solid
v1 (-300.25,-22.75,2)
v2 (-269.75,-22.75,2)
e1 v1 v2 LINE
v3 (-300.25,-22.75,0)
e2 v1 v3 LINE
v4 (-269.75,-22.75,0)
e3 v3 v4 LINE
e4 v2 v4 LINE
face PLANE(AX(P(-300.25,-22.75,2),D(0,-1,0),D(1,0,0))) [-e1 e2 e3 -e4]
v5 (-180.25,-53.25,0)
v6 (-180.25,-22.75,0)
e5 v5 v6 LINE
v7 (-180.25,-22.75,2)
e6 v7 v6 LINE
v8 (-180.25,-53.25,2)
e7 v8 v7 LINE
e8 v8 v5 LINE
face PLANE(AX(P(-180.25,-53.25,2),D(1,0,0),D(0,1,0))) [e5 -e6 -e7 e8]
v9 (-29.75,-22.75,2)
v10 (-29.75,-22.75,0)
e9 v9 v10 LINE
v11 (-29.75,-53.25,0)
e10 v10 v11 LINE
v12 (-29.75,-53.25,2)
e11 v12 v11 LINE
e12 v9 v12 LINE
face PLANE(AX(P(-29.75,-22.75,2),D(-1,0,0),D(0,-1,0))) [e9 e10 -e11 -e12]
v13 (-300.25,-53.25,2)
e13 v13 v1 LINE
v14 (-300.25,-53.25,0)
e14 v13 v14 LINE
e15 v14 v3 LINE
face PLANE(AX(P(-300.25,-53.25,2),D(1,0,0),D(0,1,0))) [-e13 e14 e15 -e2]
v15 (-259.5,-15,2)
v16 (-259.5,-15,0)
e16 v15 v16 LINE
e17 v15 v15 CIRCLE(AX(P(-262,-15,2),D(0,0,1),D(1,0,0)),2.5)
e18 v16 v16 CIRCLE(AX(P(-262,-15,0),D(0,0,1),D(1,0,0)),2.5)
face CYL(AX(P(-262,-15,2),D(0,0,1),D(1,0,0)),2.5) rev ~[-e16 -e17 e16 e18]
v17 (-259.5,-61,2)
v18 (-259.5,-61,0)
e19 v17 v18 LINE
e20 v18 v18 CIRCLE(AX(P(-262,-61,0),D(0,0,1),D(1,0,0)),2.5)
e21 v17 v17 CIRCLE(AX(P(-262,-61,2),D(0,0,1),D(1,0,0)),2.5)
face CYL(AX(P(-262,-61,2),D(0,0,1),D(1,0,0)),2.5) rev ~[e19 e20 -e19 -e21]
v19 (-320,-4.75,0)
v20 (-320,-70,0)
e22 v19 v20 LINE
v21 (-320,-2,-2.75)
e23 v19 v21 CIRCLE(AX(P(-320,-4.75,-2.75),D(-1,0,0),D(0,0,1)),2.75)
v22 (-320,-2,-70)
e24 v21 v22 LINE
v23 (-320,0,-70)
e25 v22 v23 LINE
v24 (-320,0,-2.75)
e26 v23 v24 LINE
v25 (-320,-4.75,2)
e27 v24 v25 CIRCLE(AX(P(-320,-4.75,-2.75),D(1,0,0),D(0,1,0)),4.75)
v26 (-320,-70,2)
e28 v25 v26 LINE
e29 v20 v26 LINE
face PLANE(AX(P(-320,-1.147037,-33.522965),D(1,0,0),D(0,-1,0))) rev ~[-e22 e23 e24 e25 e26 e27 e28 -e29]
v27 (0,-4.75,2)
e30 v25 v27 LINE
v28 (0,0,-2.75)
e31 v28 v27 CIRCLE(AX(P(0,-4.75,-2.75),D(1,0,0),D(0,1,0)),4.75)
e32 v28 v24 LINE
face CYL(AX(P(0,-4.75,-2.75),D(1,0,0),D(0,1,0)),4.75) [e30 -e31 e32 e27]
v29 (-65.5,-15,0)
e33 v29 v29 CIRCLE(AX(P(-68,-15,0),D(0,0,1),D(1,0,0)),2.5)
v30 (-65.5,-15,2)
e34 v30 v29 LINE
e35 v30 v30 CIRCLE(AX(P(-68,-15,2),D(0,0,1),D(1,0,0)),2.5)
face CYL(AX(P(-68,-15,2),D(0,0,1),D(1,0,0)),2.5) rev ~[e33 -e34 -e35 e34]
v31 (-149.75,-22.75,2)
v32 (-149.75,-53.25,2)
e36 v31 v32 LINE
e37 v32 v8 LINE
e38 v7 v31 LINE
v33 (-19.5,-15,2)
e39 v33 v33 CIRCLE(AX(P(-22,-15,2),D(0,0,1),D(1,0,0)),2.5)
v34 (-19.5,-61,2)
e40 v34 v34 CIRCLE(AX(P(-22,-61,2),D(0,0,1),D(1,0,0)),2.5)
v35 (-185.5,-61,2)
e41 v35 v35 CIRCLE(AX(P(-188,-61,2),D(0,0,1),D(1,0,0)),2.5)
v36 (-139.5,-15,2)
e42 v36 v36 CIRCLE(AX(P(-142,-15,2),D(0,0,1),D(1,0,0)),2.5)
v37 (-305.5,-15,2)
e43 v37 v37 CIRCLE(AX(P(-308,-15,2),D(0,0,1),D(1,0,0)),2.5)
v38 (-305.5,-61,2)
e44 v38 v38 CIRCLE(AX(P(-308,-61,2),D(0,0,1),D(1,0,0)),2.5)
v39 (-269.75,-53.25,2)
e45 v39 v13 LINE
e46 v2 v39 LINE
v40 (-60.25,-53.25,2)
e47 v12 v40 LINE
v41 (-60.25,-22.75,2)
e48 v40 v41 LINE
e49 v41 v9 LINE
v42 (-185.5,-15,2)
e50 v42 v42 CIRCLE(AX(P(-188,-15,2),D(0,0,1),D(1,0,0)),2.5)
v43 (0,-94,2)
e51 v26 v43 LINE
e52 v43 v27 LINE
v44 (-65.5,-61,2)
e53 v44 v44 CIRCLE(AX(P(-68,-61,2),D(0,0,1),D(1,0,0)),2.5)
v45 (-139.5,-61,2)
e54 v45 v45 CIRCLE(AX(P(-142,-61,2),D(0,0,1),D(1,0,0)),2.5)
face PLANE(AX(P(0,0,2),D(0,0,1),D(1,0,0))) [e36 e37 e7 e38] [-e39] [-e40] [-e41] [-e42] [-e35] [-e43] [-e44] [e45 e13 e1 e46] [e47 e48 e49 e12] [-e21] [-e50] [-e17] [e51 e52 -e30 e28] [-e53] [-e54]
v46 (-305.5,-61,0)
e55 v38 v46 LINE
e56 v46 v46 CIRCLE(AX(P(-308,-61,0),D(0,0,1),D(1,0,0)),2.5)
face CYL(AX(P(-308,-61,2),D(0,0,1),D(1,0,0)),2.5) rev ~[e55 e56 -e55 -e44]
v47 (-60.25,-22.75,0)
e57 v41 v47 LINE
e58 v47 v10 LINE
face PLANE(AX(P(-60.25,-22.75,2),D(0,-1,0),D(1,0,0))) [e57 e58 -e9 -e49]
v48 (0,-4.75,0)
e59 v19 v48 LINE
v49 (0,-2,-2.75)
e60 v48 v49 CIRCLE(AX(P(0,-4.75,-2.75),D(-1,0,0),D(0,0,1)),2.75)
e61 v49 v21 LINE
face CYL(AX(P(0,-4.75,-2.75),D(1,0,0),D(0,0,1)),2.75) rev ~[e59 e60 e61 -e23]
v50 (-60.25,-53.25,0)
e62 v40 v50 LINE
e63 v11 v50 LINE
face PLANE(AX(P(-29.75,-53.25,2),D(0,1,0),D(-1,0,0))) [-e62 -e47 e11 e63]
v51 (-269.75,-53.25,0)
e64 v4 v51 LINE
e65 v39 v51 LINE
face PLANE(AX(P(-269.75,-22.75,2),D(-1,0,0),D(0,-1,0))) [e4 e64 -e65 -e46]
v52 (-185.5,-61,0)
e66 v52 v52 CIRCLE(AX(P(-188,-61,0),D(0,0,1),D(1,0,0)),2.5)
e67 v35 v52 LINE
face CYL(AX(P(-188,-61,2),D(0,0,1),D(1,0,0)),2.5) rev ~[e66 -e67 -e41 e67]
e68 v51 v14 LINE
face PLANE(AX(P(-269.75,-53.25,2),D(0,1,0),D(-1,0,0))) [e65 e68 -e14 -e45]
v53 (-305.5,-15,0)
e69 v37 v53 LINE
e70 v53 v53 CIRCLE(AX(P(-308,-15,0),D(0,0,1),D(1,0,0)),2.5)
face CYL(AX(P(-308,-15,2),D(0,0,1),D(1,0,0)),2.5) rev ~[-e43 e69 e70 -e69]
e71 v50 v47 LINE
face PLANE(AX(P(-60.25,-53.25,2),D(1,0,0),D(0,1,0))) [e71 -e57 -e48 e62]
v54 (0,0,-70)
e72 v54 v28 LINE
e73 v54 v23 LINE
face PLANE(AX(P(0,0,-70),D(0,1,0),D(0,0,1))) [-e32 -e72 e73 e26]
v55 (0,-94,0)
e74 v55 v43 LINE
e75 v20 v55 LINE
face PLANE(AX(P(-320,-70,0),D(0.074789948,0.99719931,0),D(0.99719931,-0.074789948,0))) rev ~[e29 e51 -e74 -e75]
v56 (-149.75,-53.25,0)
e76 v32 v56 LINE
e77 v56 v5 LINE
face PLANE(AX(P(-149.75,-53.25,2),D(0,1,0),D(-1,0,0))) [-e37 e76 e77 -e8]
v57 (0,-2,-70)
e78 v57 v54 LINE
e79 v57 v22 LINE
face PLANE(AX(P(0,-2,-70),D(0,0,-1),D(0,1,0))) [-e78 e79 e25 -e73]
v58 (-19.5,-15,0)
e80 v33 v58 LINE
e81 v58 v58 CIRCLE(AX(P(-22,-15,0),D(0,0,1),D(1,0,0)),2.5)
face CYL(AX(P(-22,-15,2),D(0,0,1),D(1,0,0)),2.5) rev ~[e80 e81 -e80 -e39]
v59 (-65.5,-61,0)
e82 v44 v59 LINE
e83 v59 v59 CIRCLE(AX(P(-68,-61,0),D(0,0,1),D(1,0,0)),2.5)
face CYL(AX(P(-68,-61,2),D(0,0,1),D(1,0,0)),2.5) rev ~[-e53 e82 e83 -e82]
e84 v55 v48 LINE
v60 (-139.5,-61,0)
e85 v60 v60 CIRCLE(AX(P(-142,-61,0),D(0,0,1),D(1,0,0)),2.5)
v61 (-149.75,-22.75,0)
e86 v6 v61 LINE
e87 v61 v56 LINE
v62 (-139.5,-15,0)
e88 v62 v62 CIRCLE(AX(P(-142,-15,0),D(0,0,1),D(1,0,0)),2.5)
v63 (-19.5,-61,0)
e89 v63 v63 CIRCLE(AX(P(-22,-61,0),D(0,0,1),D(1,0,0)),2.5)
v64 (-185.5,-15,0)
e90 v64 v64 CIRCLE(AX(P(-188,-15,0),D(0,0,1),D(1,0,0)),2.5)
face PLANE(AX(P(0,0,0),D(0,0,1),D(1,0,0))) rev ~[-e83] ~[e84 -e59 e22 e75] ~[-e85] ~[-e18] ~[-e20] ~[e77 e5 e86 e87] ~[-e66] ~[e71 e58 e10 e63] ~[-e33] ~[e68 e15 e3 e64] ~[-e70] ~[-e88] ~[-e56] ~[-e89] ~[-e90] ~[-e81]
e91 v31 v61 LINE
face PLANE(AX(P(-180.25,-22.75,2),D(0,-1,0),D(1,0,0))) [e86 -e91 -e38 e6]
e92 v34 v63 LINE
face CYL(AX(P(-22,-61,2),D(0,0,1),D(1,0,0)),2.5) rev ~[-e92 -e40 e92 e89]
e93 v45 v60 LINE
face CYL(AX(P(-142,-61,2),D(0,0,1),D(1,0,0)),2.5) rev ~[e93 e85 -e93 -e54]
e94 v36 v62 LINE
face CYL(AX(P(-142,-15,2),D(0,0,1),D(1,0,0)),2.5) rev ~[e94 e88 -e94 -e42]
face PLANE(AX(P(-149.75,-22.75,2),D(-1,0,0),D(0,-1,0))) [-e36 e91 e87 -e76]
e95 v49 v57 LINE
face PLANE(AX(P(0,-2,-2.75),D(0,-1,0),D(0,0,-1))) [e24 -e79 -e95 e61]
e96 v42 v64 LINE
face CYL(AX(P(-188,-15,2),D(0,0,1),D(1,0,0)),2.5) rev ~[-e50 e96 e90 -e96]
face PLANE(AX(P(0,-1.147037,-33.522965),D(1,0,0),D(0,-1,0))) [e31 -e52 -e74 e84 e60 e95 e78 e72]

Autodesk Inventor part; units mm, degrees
ref_plane "YZ Plane" through (0, 0, 0) normal (1, 0, 0) x (0, 1, 0)
ref_plane "XZ Plane" through (0, 0, 0) normal (0, 1, 0) x (-1, 0, 0)
ref_plane "XY Plane" through (0, 0, 0) normal (0, 0, 1) x (1, 0, 0)
sketch "Sketch1" plane through (0, 0, 0) normal (0, 0, 1) x (1, 0, 0)
  line L0 (0, 0) -> (-320, 0)
  line L1 (0, -94) -> (0, 0)
  line L2 (-320, 0) -> (-320, -70)
  line L3 (-320, -70) -> (0, -94)
  point P0 (0, -47)
  dimension "d32" = 94
  dimension "d60" = 70
  dimension "d61" = 320
extrude "Plate1" add sketch "Sketch1" along normal blind 2
sketch "Sketch8" plane through (0, 0, 2) normal (0, 0, 1) x (1, 0, 0)
  line L0 (-29.75, -53.25) -> (-60.25, -53.25)
  line L1 (-60.25, -53.25) -> (-60.25, -22.75)
  line L2 (-60.25, -22.75) -> (-29.75, -22.75)
  line L3 (-29.75, -22.75) -> (-29.75, -53.25)
  line L4 (-29.75, -53.25) -> (-60.25, -22.75) construction
  line L5 (-60.25, -53.25) -> (-29.75, -22.75) construction
  circle A0 centre (-22, -61) radius 2.5
  circle A1 centre (-68, -61) radius 2.5
  circle A2 centre (-68, -15) radius 2.5
  circle A3 centre (-22, -15) radius 2.5
  line L6 (0, 0) -> (0, -94) projected
  line L7 (-320, 0) -> (0, 0) projected
  line L8 (-60.25, -53.25) -> (-68, -61) construction
  line L9 (-68, -15) -> (-22, -15) construction
  line L10 (-22, -15) -> (-22, -61) construction
  line L11 (-22, -61) -> (-68, -61) construction
  line L12 (-68, -61) -> (-68, -15) construction
  point P0 (-45, -38)
  dimension "d51" = 30.5
  dimension "d52" = 30.5
  dimension "d53" = 5
  dimension "d72" = 45
  dimension "d78" = 46
  dimension "d79" = 15
extrude "Cut3" cut sketch "Sketch8" against normal blind 2
pattern_linear "Rectangular Pattern1" count 3 spacing 120 along (-1, 0, 0) of "Cut3"
sketch "Sketch9" plane through (0, -2, 2) normal (0, 1, 0) x (-1, 0, 0)
  line L0 (320, 0) -> (0, 0)
  line L1 (0, 0) -> (0, -72)
  line L2 (0, -72) -> (320, -72)
  line L3 (320, -72) -> (320, 0)
edge flange "Flange3" height 72 angle 90 thickness 2 bend radius 2.75 thickness toward (0, 1, 0) relief round relief width 2 relief depth 1 edges at (-160, 0, 0) wall of the first edge with corners at (-320, -2, 2) (0, -2, 2) (0, -2, -70) (-320, -2, -70)
bend "Bend3"
corner "Corner3"
equation "\"d51\" = d52"
equation "\"d55\" = Thickness"
equation "\"d2\" = Thickness"
equation "\"d62\" = BendReliefWidth"
equation "\"d63\" = BendReliefDepth"
equation "\"d64\" = MinimumRemnant"
equation "\"d65\" = TransitionRadius"
equation "\"d68\" = BendRadius"
equation "\"d69\" = CornerReliefSize"
equation "\"d70\" = GapSize"
equation "\"d71\" = JacobiRadiusSize"
equation "\"BendReliefWidth\" = Thickness"
equation "\"BendReliefDepth\" = 0.5 * Thickness"
equation "\"CornerReliefSize\" = 4 * Thickness"
equation "\"MinimumRemnant\" = 2 * Thickness"
equation "\"TransitionRadius\" = BendRadius"
equation "\"JacobiRadiusSize\" = BendRadius"
equation "\"GapSize\" = Thickness"
equation "\"Thickness\" = 2"
equation "\"BendRadius\" = 2.75"
properties part number "PRS 8422 BOTTOM FDS diameter way up_D940" material "Stainless Steel"
